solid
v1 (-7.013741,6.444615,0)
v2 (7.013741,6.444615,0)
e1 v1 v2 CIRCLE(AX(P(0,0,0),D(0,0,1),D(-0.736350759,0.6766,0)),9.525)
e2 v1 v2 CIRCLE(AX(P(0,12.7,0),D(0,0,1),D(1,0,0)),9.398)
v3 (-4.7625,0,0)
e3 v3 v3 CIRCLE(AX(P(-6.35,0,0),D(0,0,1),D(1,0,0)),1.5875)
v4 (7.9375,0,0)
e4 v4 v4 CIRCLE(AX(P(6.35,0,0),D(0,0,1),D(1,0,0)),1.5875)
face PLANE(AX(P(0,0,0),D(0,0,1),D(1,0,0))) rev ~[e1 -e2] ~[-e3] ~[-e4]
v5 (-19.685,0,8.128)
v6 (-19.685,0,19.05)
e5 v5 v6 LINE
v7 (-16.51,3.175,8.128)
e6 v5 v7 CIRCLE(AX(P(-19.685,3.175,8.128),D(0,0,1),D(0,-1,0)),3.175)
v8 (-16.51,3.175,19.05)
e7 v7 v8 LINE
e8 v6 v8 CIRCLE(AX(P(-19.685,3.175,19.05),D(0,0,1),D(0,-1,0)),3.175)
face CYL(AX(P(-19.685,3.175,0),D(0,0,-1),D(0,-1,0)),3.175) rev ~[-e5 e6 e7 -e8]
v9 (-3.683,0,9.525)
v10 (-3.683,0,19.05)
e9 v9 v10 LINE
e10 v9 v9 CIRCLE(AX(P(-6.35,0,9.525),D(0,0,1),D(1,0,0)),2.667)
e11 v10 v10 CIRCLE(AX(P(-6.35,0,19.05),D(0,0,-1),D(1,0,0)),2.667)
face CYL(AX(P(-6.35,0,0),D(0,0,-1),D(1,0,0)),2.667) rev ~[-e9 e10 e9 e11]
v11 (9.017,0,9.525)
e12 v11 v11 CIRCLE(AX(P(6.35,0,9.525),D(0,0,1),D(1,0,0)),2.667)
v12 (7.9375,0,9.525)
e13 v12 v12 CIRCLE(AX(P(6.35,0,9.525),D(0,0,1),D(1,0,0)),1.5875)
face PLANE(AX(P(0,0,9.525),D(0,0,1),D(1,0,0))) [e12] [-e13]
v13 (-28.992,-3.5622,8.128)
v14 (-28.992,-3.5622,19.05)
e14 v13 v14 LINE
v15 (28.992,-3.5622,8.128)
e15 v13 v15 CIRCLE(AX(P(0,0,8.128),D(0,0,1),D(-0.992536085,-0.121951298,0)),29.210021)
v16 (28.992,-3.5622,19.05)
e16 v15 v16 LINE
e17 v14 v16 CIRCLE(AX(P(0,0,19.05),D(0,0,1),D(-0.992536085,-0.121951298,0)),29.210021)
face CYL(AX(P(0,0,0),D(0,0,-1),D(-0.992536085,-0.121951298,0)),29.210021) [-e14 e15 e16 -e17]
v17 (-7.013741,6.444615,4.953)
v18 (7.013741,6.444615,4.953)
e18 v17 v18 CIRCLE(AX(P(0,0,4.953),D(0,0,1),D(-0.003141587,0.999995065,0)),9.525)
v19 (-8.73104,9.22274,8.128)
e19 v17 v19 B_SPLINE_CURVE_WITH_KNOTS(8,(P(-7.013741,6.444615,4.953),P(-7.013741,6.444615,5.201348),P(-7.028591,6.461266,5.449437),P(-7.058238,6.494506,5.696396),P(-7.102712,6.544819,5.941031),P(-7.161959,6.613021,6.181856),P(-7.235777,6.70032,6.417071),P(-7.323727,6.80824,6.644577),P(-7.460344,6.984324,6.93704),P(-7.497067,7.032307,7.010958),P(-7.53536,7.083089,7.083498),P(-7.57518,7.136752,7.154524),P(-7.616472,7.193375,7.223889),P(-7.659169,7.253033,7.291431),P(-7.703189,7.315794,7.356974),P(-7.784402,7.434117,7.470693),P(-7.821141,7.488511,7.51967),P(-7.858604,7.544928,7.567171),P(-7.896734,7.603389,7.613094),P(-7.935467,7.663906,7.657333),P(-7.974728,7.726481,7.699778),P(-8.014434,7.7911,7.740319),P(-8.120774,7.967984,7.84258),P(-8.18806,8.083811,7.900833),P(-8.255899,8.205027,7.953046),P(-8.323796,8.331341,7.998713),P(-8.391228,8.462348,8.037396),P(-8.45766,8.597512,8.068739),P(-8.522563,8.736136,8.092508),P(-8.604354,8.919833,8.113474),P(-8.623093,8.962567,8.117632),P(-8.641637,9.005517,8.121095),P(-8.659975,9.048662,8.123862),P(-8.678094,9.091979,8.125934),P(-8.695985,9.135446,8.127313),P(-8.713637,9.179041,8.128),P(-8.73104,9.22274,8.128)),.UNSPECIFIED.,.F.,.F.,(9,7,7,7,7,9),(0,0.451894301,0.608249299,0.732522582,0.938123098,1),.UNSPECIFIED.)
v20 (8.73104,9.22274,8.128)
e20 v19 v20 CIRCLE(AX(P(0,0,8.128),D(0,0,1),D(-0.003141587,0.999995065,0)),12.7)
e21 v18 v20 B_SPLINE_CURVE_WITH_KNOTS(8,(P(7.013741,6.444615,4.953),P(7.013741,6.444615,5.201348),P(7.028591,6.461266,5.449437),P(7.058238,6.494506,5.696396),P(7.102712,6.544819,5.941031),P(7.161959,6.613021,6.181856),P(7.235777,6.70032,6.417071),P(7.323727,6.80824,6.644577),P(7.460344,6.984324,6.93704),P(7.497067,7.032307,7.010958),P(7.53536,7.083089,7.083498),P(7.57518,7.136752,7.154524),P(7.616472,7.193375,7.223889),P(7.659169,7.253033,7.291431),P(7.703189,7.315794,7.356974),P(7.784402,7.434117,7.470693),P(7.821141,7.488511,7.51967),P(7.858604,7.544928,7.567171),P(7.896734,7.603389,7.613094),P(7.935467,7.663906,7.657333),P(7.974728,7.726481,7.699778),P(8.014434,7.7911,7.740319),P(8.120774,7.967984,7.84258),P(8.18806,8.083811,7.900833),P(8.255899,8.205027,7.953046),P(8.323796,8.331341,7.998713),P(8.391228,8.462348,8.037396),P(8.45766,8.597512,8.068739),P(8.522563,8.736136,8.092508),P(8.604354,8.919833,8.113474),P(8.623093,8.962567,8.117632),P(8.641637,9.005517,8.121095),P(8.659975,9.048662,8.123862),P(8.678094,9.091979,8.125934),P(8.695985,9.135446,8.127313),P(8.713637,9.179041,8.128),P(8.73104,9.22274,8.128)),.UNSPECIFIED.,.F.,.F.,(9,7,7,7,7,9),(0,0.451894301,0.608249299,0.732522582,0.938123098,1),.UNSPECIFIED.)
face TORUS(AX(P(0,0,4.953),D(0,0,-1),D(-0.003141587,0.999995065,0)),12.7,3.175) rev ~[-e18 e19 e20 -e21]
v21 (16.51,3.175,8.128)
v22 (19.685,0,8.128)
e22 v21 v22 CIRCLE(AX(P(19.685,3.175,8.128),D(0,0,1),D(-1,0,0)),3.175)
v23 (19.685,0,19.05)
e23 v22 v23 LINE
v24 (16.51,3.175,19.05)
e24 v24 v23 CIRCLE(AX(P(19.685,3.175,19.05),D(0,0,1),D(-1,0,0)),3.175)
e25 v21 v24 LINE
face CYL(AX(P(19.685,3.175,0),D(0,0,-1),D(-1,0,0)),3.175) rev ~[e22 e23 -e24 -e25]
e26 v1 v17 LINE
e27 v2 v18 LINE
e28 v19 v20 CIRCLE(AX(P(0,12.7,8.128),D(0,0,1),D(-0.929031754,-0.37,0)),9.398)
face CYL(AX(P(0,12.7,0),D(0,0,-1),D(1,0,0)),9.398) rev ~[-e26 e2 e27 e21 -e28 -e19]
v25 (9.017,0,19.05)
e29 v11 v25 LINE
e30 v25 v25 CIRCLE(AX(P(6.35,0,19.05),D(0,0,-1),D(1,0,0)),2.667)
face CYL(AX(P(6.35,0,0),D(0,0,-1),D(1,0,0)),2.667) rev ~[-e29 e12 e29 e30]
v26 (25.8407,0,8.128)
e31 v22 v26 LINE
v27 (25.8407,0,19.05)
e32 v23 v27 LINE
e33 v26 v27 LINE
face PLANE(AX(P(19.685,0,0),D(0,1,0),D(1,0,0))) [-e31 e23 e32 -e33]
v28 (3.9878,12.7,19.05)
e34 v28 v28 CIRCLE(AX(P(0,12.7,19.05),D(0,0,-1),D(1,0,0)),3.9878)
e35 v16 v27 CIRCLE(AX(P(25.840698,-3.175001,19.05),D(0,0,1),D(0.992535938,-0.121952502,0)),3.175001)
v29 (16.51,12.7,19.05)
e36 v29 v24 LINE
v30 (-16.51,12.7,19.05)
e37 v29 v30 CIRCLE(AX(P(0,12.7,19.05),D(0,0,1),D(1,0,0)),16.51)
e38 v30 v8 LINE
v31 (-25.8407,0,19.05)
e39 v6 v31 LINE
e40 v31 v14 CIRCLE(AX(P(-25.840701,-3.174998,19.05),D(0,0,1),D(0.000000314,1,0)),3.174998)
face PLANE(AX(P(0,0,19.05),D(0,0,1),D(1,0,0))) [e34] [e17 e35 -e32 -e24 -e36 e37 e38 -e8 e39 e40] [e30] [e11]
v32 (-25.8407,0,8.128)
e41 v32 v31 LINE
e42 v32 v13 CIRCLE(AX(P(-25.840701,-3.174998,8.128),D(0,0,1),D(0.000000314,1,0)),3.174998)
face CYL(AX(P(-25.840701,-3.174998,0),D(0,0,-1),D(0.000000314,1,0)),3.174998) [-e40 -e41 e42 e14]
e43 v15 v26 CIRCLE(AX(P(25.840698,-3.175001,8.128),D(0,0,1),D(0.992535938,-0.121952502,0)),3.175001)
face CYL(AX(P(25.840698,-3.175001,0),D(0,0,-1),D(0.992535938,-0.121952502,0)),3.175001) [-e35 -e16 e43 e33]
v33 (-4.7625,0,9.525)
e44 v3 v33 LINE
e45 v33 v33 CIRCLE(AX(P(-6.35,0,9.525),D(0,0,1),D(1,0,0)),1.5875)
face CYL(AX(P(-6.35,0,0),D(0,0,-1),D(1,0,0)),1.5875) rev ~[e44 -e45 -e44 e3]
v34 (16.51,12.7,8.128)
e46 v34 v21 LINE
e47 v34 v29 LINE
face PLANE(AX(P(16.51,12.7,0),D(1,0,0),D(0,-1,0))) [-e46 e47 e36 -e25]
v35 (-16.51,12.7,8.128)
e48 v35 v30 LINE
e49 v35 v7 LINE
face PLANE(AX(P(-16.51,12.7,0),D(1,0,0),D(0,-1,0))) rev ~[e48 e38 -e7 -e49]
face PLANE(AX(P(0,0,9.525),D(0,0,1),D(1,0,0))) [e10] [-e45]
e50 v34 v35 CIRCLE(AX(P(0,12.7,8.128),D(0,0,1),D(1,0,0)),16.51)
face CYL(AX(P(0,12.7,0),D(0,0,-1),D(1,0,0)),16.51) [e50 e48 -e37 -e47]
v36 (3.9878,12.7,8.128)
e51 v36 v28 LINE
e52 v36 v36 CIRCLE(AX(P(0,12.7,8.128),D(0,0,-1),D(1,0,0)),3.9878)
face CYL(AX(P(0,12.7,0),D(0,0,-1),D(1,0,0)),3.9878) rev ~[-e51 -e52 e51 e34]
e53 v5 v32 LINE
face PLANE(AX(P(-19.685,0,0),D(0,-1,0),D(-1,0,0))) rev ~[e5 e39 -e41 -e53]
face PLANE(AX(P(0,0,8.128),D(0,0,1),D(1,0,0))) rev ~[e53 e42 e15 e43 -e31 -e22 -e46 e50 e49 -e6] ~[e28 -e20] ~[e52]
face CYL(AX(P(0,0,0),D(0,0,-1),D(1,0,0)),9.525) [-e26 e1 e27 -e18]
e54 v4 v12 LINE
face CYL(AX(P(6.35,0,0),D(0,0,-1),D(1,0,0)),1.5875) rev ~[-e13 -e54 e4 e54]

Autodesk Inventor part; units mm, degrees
ref_plane "YZ Plane" through (0, 0, 0) normal (1, 0, 0) x (0, 1, 0)
ref_plane "XZ Plane" through (0, 0, 0) normal (0, 1, 0) x (-1, 0, 0)
ref_plane "XY Plane" through (0, 0, 0) normal (0, 0, 1) x (1, 0, 0)
sketch "Sketch1" plane through (0, 0, 0) normal (0, 0, 1) x (1, 0, 0)
  circle A0 centre (0, 12.7) radius 3.9878
  circle A1 centre (-6.35, 0) radius 1.5875
  circle A2 centre (6.35, 0) radius 1.5875
  circle A3 centre (0, 0) radius 9.525
  arc A4 (-28.992, -3.5622) -> (28.992, -3.5622) centre (0, 0) ccw
  line L0 (-16.51, 12.7) -> (-16.51, 3.175)
  line L1 (16.51, 12.7) -> (16.51, 3.175)
  line L2 (19.685, 0) -> (25.8407, 0)
  line L3 (-19.685, 0) -> (-25.8407, 0)
  arc A5 (16.51, 12.7) -> (-16.51, 12.7) centre (0, 12.7) ccw
  arc A6 (-25.8407, 0) -> (-28.992, -3.5622) centre (-25.8407, -3.175) ccw
  arc A7 (-19.685, 0) -> (-16.51, 3.175) centre (-19.685, 3.175) ccw
  arc A8 (16.51, 3.175) -> (19.685, 0) centre (19.685, 3.175) ccw
  arc A9 (28.992, -3.5622) -> (25.8407, 0) centre (25.8407, -3.175) ccw
  circle A10 centre (6.35, 0) radius 2.667
  circle A11 centre (-6.35, 0) radius 2.667
  circle A12 centre (0, 12.7) radius 9.398
  point P0 (-9.525, 0)
  point P1 (9.525, 0)
  point P2 (-16.51, -24.0966)
  point P3 (16.51, -24.0966)
  point P4 (-29.21, 0)
  point P5 (29.21, 0)
  point P6 (-2.077, 9.2958)
  point P7 (2.077, 9.2958)
  point P8 (7.0137, 6.4446)
  point P9 (-7.0137, 6.4446)
  dimension "d20" = 7.9756
  dimension "d44" = 3.175
  dimension "d51" = 5.334
  dimension "d52" = 5.334
  dimension "d57" = 18.796
extrude "Extrusion9" add sketch "Sketch1" along normal blind 19.05 contours A0 A3 | A0 A3 A12 | A3 A0 | A0 A3 A12 | A12 A3 | A1 | A2 | A6 L3 A7 L0 A5 L1 A8 L2 A9 A4 | A10 | A11
extrude "Extrusion10" cut sketch "Sketch1" along normal blind 8.128 contours A0 A3 | A0 A3 A12 | A3 A0 | A0 A3 A12 | A6 L3 A7 L0 A5 L1 A8 L2 A9 A4
extrude "Extrusion11" cut sketch "Sketch1" along normal blind 38.1 contours A0 A3 | A3 A0
extrude "Extrusion12" cut sketch "Sketch1" along normal blind 38.1 contours A1 | A2 | A10 | A11
extrude "Extrusion13" add sketch "Sketch1" along normal blind 9.525 contours A10 | A11
fillet "Fillet2" radius 3.175 1 edges at (0, -9.525, 8.128)
properties part number "Crank on Crankshaft_3DPrint"
